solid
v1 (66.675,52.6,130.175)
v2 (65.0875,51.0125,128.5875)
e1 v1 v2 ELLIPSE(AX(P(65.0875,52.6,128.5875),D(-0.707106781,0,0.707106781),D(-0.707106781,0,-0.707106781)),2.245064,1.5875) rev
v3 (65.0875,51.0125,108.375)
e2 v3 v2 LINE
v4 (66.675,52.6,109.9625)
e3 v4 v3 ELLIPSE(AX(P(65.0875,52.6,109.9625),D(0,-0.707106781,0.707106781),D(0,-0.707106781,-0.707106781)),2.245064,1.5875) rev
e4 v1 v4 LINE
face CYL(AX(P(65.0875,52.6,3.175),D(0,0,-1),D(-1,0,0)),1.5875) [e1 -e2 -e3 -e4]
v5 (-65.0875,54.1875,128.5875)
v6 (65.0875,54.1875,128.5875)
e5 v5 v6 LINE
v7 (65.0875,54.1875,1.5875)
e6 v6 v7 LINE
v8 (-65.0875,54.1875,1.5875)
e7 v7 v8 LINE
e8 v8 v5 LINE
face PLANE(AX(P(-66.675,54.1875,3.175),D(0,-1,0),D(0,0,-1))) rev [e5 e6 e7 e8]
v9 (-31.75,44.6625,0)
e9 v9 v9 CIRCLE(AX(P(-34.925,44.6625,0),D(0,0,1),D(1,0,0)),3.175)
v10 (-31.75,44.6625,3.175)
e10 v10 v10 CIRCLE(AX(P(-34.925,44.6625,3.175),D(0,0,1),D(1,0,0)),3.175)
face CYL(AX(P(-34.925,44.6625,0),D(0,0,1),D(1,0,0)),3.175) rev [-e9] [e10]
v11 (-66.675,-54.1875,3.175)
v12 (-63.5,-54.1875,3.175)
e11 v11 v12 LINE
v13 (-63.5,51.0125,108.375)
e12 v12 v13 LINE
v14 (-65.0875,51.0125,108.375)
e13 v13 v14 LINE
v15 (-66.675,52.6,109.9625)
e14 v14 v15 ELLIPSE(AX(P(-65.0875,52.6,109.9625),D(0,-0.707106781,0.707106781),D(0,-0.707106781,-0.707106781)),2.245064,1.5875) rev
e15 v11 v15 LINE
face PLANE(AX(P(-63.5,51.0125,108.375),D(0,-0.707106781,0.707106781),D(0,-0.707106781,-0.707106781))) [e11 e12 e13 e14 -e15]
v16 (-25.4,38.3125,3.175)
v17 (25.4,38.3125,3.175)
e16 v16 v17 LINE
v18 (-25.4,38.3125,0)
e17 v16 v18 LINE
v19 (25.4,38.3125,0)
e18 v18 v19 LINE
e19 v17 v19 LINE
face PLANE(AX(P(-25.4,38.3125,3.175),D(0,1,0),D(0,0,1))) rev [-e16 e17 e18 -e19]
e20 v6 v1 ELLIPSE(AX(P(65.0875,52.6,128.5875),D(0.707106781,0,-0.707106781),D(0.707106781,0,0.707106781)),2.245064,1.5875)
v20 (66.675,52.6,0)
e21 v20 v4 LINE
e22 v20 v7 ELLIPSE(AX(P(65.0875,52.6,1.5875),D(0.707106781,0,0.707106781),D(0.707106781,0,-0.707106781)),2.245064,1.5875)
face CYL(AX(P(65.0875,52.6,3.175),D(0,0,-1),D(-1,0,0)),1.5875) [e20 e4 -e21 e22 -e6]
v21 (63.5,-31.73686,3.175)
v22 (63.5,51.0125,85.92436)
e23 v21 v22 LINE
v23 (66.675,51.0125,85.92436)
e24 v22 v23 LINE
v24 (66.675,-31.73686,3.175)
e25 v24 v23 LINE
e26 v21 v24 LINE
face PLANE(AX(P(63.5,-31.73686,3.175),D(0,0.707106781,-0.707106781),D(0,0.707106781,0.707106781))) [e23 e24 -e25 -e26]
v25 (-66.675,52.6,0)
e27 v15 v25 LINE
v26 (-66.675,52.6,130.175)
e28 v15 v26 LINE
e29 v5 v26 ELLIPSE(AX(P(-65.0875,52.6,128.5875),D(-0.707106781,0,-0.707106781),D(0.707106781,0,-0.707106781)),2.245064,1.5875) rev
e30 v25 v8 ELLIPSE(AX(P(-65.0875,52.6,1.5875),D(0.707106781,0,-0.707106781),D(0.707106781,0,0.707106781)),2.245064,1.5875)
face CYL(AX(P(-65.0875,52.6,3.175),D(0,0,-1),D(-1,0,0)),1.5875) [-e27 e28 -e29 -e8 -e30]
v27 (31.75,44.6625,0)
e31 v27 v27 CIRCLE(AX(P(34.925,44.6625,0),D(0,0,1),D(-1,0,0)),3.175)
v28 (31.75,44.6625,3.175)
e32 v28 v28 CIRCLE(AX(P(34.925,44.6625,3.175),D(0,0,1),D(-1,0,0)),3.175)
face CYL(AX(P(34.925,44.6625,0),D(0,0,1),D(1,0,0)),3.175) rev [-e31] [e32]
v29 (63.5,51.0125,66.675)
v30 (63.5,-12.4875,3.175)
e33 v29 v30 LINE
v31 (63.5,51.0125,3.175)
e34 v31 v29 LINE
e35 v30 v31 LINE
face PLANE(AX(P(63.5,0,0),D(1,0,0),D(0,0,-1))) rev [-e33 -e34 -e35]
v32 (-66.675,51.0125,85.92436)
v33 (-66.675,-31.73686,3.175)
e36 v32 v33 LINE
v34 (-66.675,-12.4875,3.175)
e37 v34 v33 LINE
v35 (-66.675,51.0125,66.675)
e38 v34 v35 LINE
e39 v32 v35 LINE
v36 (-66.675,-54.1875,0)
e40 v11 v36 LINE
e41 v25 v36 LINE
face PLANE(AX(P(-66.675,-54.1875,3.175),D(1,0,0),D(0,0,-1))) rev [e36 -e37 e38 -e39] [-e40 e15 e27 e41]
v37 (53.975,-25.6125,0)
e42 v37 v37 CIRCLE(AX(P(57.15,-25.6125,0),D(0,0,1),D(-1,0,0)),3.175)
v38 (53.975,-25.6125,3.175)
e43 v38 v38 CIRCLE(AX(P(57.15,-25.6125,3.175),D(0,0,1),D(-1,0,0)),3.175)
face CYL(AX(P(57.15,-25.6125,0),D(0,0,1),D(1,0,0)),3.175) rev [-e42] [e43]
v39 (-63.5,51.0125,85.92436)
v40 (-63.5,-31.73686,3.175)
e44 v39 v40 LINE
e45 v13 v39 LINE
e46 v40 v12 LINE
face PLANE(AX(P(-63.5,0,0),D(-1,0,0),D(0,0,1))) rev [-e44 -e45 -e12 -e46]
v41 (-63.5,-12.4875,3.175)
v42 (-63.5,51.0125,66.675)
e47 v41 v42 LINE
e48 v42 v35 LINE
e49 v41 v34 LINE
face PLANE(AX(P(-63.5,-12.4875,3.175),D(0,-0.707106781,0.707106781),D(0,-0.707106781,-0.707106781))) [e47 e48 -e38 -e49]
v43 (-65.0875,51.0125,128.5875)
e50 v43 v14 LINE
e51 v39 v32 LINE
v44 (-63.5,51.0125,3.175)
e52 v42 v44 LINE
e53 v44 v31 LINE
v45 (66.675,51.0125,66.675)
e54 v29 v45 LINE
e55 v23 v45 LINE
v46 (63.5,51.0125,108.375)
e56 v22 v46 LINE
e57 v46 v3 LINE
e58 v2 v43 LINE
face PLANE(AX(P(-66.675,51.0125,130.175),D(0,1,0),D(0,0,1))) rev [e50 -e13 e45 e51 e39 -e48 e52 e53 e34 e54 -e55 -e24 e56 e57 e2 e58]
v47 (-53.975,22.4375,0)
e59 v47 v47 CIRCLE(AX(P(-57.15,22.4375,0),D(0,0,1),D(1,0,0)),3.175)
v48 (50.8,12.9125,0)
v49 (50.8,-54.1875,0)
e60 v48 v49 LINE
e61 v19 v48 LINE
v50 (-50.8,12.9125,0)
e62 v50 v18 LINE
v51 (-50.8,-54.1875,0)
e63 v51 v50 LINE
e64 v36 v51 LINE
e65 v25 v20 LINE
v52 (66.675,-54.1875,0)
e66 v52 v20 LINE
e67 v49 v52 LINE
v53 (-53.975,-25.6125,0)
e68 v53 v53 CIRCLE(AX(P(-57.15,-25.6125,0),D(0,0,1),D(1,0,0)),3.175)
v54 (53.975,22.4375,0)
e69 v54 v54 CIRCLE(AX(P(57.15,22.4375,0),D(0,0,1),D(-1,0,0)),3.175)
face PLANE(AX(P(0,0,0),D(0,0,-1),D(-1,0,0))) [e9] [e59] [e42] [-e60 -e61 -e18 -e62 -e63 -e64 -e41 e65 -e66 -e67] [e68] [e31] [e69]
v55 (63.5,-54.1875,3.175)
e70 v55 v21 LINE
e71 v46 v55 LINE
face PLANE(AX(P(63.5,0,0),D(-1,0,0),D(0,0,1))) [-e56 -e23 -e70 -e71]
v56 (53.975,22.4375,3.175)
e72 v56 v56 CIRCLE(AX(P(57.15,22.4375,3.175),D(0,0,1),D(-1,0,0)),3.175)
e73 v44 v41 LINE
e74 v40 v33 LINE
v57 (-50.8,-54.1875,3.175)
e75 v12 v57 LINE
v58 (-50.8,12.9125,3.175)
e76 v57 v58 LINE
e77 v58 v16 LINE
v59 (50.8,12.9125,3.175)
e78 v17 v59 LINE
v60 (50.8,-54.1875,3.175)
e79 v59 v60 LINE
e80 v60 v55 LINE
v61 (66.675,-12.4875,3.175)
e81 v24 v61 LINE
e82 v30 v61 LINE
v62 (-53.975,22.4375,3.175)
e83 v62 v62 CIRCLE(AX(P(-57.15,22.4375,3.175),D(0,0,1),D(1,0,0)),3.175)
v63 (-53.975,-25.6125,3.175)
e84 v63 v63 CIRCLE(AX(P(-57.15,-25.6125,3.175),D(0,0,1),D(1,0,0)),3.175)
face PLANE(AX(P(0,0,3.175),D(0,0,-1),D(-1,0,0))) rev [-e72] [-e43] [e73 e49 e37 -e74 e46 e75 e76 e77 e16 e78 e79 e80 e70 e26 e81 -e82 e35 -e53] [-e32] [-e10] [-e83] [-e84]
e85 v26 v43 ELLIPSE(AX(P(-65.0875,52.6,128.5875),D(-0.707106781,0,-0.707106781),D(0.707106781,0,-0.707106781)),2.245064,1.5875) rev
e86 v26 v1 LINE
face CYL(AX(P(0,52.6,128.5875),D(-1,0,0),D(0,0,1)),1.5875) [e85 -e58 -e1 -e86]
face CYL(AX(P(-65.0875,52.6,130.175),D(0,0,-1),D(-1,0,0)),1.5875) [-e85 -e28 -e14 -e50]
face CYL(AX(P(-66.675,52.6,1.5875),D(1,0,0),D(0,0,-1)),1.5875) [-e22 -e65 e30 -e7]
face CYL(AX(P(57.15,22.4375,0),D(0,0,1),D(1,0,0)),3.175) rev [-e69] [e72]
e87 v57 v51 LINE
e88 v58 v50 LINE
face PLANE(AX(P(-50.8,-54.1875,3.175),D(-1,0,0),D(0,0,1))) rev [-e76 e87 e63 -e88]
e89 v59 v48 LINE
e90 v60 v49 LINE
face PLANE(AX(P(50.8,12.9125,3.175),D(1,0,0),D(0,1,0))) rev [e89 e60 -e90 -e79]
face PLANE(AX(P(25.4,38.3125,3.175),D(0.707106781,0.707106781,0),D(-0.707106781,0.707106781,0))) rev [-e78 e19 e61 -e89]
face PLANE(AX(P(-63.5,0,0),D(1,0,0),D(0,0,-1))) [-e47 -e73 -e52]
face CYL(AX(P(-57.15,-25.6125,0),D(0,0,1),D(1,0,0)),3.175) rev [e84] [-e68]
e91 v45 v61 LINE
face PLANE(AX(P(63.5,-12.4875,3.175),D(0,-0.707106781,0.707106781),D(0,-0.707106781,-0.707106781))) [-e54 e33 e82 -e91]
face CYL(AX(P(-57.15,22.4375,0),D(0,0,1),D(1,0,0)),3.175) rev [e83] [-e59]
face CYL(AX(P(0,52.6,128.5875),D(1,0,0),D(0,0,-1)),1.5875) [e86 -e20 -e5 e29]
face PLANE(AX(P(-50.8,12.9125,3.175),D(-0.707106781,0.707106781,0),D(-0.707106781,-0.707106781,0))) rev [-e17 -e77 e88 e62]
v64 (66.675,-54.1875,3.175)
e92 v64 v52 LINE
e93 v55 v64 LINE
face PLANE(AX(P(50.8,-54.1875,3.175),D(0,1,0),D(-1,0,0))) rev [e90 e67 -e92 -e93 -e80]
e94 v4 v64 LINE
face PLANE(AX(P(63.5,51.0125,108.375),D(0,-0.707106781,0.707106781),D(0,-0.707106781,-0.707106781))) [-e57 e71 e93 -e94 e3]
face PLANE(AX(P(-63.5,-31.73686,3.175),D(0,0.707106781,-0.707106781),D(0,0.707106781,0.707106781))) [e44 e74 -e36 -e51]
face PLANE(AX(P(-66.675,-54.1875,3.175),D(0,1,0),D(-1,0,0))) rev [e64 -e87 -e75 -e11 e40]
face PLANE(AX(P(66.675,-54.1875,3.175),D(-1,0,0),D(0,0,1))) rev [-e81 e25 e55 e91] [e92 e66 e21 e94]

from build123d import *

# Parameters (mm, degrees)
BOSS_EXTRUDE1_DEPTH = 3.175
SKETCH3_R           = 3.175
CUT_EXTRUDE1_DEPTH  = 86.976283948
SKETCH4_W           = 133.35
SKETCH4_H           = 3.175
BOSS_EXTRUDE2_DEPTH = 127
BOSS_EXTRUDE3_DEPTH = 3.175
BOSS_EXTRUDE4_DEPTH = 3.175
FILLET2_R           = 1.5875


with BuildPart() as part:
    # Sketch2 → Boss-Extrude1 (new body)
    with BuildSketch(Plane.XY):
        Polygon((-50.8, -54.187499956), (-50.8, 12.912499956), (-25.4, 38.312499956), (25.4, 38.312499956), (50.8, 12.912499956), (50.8, -54.187499956), (66.675, -54.187499956), (66.675, 54.187499956), (-66.675, 54.187499956), (-66.675, -54.187499956), align=None)
    extrude(amount=BOSS_EXTRUDE1_DEPTH)

    # Sketch3 → Cut-Extrude1 (cut, through all)
    with BuildSketch(Plane.XY.offset(3.175)):
        with Locations((-57.15, -25.612499956)):
            Circle(SKETCH3_R)
        with Locations((-57.15, 22.437499956)):
            Circle(SKETCH3_R)
        with Locations((-34.925, 44.662499956)):
            Circle(SKETCH3_R)
        with Locations(Location((34.925, 44.662499956, 0), (0, 0, 180))):
            Circle(SKETCH3_R)
        with Locations(Location((57.15, 22.437499956, 0), (0, 0, 180))):
            Circle(SKETCH3_R)
        with Locations(Location((57.15, -25.612499956, 0), (0, 0, 180))):
            Circle(SKETCH3_R)
    extrude(amount=-CUT_EXTRUDE1_DEPTH, mode=Mode.SUBTRACT)

    # Sketch4 → Boss-Extrude2 (add)
    with BuildSketch(Plane.XY.offset(3.175)):
        with Locations((0, 52.599999956)):
            Rectangle(SKETCH4_W, SKETCH4_H)
    extrude(amount=BOSS_EXTRUDE2_DEPTH)

    # Sketch5 → Boss-Extrude3 (add)
    with BuildSketch(Plane.ZY.offset(66.675)):
        Polygon((3.175, -12.487500044), (66.675, 51.012499956), (3.175, 51.012499956), align=None)
        Polygon((108.374999912, 51.012499956), (3.175, -54.187499956), (3.175, -31.736859653), (85.924359609, 51.012499956), align=None)
    extrude(amount=-BOSS_EXTRUDE3_DEPTH)

    # Sketch6 → Boss-Extrude4 (add)
    with BuildSketch(Plane(origin=(66.675, 0, 0), x_dir=(0, 0, -1), z_dir=(1, 0, 0))):
        Polygon((-108.374999912, 51.012499956), (-3.175, -54.187499956), (-3.175, -31.736859653), (-85.924359609, 51.012499956), align=None)
        Polygon((-3.175, -12.487500044), (-66.675, 51.012499956), (-3.175, 51.012499956), align=None)
    extrude(amount=-BOSS_EXTRUDE4_DEPTH)

    # Fillet2
    fillet2_edges = [part.edges().sort_by_distance(p)[0] for p in [
        (66.675, 54.187499956, 65.0875),
        (0, 54.187499956, 130.175),
        (-66.675, 54.187499956, 65.0875),
        (0, 54.187499956, 0),
        (66.675, 51.012499956, 119.274999956),
        (0, 51.012499956, 130.175),
        (-66.675, 51.012499956, 119.274999956),
    ]]
    fillet(fillet2_edges, radius=FILLET2_R - 0.0001)  # a hair under: the kernel refuses the full size


solid = part.part
